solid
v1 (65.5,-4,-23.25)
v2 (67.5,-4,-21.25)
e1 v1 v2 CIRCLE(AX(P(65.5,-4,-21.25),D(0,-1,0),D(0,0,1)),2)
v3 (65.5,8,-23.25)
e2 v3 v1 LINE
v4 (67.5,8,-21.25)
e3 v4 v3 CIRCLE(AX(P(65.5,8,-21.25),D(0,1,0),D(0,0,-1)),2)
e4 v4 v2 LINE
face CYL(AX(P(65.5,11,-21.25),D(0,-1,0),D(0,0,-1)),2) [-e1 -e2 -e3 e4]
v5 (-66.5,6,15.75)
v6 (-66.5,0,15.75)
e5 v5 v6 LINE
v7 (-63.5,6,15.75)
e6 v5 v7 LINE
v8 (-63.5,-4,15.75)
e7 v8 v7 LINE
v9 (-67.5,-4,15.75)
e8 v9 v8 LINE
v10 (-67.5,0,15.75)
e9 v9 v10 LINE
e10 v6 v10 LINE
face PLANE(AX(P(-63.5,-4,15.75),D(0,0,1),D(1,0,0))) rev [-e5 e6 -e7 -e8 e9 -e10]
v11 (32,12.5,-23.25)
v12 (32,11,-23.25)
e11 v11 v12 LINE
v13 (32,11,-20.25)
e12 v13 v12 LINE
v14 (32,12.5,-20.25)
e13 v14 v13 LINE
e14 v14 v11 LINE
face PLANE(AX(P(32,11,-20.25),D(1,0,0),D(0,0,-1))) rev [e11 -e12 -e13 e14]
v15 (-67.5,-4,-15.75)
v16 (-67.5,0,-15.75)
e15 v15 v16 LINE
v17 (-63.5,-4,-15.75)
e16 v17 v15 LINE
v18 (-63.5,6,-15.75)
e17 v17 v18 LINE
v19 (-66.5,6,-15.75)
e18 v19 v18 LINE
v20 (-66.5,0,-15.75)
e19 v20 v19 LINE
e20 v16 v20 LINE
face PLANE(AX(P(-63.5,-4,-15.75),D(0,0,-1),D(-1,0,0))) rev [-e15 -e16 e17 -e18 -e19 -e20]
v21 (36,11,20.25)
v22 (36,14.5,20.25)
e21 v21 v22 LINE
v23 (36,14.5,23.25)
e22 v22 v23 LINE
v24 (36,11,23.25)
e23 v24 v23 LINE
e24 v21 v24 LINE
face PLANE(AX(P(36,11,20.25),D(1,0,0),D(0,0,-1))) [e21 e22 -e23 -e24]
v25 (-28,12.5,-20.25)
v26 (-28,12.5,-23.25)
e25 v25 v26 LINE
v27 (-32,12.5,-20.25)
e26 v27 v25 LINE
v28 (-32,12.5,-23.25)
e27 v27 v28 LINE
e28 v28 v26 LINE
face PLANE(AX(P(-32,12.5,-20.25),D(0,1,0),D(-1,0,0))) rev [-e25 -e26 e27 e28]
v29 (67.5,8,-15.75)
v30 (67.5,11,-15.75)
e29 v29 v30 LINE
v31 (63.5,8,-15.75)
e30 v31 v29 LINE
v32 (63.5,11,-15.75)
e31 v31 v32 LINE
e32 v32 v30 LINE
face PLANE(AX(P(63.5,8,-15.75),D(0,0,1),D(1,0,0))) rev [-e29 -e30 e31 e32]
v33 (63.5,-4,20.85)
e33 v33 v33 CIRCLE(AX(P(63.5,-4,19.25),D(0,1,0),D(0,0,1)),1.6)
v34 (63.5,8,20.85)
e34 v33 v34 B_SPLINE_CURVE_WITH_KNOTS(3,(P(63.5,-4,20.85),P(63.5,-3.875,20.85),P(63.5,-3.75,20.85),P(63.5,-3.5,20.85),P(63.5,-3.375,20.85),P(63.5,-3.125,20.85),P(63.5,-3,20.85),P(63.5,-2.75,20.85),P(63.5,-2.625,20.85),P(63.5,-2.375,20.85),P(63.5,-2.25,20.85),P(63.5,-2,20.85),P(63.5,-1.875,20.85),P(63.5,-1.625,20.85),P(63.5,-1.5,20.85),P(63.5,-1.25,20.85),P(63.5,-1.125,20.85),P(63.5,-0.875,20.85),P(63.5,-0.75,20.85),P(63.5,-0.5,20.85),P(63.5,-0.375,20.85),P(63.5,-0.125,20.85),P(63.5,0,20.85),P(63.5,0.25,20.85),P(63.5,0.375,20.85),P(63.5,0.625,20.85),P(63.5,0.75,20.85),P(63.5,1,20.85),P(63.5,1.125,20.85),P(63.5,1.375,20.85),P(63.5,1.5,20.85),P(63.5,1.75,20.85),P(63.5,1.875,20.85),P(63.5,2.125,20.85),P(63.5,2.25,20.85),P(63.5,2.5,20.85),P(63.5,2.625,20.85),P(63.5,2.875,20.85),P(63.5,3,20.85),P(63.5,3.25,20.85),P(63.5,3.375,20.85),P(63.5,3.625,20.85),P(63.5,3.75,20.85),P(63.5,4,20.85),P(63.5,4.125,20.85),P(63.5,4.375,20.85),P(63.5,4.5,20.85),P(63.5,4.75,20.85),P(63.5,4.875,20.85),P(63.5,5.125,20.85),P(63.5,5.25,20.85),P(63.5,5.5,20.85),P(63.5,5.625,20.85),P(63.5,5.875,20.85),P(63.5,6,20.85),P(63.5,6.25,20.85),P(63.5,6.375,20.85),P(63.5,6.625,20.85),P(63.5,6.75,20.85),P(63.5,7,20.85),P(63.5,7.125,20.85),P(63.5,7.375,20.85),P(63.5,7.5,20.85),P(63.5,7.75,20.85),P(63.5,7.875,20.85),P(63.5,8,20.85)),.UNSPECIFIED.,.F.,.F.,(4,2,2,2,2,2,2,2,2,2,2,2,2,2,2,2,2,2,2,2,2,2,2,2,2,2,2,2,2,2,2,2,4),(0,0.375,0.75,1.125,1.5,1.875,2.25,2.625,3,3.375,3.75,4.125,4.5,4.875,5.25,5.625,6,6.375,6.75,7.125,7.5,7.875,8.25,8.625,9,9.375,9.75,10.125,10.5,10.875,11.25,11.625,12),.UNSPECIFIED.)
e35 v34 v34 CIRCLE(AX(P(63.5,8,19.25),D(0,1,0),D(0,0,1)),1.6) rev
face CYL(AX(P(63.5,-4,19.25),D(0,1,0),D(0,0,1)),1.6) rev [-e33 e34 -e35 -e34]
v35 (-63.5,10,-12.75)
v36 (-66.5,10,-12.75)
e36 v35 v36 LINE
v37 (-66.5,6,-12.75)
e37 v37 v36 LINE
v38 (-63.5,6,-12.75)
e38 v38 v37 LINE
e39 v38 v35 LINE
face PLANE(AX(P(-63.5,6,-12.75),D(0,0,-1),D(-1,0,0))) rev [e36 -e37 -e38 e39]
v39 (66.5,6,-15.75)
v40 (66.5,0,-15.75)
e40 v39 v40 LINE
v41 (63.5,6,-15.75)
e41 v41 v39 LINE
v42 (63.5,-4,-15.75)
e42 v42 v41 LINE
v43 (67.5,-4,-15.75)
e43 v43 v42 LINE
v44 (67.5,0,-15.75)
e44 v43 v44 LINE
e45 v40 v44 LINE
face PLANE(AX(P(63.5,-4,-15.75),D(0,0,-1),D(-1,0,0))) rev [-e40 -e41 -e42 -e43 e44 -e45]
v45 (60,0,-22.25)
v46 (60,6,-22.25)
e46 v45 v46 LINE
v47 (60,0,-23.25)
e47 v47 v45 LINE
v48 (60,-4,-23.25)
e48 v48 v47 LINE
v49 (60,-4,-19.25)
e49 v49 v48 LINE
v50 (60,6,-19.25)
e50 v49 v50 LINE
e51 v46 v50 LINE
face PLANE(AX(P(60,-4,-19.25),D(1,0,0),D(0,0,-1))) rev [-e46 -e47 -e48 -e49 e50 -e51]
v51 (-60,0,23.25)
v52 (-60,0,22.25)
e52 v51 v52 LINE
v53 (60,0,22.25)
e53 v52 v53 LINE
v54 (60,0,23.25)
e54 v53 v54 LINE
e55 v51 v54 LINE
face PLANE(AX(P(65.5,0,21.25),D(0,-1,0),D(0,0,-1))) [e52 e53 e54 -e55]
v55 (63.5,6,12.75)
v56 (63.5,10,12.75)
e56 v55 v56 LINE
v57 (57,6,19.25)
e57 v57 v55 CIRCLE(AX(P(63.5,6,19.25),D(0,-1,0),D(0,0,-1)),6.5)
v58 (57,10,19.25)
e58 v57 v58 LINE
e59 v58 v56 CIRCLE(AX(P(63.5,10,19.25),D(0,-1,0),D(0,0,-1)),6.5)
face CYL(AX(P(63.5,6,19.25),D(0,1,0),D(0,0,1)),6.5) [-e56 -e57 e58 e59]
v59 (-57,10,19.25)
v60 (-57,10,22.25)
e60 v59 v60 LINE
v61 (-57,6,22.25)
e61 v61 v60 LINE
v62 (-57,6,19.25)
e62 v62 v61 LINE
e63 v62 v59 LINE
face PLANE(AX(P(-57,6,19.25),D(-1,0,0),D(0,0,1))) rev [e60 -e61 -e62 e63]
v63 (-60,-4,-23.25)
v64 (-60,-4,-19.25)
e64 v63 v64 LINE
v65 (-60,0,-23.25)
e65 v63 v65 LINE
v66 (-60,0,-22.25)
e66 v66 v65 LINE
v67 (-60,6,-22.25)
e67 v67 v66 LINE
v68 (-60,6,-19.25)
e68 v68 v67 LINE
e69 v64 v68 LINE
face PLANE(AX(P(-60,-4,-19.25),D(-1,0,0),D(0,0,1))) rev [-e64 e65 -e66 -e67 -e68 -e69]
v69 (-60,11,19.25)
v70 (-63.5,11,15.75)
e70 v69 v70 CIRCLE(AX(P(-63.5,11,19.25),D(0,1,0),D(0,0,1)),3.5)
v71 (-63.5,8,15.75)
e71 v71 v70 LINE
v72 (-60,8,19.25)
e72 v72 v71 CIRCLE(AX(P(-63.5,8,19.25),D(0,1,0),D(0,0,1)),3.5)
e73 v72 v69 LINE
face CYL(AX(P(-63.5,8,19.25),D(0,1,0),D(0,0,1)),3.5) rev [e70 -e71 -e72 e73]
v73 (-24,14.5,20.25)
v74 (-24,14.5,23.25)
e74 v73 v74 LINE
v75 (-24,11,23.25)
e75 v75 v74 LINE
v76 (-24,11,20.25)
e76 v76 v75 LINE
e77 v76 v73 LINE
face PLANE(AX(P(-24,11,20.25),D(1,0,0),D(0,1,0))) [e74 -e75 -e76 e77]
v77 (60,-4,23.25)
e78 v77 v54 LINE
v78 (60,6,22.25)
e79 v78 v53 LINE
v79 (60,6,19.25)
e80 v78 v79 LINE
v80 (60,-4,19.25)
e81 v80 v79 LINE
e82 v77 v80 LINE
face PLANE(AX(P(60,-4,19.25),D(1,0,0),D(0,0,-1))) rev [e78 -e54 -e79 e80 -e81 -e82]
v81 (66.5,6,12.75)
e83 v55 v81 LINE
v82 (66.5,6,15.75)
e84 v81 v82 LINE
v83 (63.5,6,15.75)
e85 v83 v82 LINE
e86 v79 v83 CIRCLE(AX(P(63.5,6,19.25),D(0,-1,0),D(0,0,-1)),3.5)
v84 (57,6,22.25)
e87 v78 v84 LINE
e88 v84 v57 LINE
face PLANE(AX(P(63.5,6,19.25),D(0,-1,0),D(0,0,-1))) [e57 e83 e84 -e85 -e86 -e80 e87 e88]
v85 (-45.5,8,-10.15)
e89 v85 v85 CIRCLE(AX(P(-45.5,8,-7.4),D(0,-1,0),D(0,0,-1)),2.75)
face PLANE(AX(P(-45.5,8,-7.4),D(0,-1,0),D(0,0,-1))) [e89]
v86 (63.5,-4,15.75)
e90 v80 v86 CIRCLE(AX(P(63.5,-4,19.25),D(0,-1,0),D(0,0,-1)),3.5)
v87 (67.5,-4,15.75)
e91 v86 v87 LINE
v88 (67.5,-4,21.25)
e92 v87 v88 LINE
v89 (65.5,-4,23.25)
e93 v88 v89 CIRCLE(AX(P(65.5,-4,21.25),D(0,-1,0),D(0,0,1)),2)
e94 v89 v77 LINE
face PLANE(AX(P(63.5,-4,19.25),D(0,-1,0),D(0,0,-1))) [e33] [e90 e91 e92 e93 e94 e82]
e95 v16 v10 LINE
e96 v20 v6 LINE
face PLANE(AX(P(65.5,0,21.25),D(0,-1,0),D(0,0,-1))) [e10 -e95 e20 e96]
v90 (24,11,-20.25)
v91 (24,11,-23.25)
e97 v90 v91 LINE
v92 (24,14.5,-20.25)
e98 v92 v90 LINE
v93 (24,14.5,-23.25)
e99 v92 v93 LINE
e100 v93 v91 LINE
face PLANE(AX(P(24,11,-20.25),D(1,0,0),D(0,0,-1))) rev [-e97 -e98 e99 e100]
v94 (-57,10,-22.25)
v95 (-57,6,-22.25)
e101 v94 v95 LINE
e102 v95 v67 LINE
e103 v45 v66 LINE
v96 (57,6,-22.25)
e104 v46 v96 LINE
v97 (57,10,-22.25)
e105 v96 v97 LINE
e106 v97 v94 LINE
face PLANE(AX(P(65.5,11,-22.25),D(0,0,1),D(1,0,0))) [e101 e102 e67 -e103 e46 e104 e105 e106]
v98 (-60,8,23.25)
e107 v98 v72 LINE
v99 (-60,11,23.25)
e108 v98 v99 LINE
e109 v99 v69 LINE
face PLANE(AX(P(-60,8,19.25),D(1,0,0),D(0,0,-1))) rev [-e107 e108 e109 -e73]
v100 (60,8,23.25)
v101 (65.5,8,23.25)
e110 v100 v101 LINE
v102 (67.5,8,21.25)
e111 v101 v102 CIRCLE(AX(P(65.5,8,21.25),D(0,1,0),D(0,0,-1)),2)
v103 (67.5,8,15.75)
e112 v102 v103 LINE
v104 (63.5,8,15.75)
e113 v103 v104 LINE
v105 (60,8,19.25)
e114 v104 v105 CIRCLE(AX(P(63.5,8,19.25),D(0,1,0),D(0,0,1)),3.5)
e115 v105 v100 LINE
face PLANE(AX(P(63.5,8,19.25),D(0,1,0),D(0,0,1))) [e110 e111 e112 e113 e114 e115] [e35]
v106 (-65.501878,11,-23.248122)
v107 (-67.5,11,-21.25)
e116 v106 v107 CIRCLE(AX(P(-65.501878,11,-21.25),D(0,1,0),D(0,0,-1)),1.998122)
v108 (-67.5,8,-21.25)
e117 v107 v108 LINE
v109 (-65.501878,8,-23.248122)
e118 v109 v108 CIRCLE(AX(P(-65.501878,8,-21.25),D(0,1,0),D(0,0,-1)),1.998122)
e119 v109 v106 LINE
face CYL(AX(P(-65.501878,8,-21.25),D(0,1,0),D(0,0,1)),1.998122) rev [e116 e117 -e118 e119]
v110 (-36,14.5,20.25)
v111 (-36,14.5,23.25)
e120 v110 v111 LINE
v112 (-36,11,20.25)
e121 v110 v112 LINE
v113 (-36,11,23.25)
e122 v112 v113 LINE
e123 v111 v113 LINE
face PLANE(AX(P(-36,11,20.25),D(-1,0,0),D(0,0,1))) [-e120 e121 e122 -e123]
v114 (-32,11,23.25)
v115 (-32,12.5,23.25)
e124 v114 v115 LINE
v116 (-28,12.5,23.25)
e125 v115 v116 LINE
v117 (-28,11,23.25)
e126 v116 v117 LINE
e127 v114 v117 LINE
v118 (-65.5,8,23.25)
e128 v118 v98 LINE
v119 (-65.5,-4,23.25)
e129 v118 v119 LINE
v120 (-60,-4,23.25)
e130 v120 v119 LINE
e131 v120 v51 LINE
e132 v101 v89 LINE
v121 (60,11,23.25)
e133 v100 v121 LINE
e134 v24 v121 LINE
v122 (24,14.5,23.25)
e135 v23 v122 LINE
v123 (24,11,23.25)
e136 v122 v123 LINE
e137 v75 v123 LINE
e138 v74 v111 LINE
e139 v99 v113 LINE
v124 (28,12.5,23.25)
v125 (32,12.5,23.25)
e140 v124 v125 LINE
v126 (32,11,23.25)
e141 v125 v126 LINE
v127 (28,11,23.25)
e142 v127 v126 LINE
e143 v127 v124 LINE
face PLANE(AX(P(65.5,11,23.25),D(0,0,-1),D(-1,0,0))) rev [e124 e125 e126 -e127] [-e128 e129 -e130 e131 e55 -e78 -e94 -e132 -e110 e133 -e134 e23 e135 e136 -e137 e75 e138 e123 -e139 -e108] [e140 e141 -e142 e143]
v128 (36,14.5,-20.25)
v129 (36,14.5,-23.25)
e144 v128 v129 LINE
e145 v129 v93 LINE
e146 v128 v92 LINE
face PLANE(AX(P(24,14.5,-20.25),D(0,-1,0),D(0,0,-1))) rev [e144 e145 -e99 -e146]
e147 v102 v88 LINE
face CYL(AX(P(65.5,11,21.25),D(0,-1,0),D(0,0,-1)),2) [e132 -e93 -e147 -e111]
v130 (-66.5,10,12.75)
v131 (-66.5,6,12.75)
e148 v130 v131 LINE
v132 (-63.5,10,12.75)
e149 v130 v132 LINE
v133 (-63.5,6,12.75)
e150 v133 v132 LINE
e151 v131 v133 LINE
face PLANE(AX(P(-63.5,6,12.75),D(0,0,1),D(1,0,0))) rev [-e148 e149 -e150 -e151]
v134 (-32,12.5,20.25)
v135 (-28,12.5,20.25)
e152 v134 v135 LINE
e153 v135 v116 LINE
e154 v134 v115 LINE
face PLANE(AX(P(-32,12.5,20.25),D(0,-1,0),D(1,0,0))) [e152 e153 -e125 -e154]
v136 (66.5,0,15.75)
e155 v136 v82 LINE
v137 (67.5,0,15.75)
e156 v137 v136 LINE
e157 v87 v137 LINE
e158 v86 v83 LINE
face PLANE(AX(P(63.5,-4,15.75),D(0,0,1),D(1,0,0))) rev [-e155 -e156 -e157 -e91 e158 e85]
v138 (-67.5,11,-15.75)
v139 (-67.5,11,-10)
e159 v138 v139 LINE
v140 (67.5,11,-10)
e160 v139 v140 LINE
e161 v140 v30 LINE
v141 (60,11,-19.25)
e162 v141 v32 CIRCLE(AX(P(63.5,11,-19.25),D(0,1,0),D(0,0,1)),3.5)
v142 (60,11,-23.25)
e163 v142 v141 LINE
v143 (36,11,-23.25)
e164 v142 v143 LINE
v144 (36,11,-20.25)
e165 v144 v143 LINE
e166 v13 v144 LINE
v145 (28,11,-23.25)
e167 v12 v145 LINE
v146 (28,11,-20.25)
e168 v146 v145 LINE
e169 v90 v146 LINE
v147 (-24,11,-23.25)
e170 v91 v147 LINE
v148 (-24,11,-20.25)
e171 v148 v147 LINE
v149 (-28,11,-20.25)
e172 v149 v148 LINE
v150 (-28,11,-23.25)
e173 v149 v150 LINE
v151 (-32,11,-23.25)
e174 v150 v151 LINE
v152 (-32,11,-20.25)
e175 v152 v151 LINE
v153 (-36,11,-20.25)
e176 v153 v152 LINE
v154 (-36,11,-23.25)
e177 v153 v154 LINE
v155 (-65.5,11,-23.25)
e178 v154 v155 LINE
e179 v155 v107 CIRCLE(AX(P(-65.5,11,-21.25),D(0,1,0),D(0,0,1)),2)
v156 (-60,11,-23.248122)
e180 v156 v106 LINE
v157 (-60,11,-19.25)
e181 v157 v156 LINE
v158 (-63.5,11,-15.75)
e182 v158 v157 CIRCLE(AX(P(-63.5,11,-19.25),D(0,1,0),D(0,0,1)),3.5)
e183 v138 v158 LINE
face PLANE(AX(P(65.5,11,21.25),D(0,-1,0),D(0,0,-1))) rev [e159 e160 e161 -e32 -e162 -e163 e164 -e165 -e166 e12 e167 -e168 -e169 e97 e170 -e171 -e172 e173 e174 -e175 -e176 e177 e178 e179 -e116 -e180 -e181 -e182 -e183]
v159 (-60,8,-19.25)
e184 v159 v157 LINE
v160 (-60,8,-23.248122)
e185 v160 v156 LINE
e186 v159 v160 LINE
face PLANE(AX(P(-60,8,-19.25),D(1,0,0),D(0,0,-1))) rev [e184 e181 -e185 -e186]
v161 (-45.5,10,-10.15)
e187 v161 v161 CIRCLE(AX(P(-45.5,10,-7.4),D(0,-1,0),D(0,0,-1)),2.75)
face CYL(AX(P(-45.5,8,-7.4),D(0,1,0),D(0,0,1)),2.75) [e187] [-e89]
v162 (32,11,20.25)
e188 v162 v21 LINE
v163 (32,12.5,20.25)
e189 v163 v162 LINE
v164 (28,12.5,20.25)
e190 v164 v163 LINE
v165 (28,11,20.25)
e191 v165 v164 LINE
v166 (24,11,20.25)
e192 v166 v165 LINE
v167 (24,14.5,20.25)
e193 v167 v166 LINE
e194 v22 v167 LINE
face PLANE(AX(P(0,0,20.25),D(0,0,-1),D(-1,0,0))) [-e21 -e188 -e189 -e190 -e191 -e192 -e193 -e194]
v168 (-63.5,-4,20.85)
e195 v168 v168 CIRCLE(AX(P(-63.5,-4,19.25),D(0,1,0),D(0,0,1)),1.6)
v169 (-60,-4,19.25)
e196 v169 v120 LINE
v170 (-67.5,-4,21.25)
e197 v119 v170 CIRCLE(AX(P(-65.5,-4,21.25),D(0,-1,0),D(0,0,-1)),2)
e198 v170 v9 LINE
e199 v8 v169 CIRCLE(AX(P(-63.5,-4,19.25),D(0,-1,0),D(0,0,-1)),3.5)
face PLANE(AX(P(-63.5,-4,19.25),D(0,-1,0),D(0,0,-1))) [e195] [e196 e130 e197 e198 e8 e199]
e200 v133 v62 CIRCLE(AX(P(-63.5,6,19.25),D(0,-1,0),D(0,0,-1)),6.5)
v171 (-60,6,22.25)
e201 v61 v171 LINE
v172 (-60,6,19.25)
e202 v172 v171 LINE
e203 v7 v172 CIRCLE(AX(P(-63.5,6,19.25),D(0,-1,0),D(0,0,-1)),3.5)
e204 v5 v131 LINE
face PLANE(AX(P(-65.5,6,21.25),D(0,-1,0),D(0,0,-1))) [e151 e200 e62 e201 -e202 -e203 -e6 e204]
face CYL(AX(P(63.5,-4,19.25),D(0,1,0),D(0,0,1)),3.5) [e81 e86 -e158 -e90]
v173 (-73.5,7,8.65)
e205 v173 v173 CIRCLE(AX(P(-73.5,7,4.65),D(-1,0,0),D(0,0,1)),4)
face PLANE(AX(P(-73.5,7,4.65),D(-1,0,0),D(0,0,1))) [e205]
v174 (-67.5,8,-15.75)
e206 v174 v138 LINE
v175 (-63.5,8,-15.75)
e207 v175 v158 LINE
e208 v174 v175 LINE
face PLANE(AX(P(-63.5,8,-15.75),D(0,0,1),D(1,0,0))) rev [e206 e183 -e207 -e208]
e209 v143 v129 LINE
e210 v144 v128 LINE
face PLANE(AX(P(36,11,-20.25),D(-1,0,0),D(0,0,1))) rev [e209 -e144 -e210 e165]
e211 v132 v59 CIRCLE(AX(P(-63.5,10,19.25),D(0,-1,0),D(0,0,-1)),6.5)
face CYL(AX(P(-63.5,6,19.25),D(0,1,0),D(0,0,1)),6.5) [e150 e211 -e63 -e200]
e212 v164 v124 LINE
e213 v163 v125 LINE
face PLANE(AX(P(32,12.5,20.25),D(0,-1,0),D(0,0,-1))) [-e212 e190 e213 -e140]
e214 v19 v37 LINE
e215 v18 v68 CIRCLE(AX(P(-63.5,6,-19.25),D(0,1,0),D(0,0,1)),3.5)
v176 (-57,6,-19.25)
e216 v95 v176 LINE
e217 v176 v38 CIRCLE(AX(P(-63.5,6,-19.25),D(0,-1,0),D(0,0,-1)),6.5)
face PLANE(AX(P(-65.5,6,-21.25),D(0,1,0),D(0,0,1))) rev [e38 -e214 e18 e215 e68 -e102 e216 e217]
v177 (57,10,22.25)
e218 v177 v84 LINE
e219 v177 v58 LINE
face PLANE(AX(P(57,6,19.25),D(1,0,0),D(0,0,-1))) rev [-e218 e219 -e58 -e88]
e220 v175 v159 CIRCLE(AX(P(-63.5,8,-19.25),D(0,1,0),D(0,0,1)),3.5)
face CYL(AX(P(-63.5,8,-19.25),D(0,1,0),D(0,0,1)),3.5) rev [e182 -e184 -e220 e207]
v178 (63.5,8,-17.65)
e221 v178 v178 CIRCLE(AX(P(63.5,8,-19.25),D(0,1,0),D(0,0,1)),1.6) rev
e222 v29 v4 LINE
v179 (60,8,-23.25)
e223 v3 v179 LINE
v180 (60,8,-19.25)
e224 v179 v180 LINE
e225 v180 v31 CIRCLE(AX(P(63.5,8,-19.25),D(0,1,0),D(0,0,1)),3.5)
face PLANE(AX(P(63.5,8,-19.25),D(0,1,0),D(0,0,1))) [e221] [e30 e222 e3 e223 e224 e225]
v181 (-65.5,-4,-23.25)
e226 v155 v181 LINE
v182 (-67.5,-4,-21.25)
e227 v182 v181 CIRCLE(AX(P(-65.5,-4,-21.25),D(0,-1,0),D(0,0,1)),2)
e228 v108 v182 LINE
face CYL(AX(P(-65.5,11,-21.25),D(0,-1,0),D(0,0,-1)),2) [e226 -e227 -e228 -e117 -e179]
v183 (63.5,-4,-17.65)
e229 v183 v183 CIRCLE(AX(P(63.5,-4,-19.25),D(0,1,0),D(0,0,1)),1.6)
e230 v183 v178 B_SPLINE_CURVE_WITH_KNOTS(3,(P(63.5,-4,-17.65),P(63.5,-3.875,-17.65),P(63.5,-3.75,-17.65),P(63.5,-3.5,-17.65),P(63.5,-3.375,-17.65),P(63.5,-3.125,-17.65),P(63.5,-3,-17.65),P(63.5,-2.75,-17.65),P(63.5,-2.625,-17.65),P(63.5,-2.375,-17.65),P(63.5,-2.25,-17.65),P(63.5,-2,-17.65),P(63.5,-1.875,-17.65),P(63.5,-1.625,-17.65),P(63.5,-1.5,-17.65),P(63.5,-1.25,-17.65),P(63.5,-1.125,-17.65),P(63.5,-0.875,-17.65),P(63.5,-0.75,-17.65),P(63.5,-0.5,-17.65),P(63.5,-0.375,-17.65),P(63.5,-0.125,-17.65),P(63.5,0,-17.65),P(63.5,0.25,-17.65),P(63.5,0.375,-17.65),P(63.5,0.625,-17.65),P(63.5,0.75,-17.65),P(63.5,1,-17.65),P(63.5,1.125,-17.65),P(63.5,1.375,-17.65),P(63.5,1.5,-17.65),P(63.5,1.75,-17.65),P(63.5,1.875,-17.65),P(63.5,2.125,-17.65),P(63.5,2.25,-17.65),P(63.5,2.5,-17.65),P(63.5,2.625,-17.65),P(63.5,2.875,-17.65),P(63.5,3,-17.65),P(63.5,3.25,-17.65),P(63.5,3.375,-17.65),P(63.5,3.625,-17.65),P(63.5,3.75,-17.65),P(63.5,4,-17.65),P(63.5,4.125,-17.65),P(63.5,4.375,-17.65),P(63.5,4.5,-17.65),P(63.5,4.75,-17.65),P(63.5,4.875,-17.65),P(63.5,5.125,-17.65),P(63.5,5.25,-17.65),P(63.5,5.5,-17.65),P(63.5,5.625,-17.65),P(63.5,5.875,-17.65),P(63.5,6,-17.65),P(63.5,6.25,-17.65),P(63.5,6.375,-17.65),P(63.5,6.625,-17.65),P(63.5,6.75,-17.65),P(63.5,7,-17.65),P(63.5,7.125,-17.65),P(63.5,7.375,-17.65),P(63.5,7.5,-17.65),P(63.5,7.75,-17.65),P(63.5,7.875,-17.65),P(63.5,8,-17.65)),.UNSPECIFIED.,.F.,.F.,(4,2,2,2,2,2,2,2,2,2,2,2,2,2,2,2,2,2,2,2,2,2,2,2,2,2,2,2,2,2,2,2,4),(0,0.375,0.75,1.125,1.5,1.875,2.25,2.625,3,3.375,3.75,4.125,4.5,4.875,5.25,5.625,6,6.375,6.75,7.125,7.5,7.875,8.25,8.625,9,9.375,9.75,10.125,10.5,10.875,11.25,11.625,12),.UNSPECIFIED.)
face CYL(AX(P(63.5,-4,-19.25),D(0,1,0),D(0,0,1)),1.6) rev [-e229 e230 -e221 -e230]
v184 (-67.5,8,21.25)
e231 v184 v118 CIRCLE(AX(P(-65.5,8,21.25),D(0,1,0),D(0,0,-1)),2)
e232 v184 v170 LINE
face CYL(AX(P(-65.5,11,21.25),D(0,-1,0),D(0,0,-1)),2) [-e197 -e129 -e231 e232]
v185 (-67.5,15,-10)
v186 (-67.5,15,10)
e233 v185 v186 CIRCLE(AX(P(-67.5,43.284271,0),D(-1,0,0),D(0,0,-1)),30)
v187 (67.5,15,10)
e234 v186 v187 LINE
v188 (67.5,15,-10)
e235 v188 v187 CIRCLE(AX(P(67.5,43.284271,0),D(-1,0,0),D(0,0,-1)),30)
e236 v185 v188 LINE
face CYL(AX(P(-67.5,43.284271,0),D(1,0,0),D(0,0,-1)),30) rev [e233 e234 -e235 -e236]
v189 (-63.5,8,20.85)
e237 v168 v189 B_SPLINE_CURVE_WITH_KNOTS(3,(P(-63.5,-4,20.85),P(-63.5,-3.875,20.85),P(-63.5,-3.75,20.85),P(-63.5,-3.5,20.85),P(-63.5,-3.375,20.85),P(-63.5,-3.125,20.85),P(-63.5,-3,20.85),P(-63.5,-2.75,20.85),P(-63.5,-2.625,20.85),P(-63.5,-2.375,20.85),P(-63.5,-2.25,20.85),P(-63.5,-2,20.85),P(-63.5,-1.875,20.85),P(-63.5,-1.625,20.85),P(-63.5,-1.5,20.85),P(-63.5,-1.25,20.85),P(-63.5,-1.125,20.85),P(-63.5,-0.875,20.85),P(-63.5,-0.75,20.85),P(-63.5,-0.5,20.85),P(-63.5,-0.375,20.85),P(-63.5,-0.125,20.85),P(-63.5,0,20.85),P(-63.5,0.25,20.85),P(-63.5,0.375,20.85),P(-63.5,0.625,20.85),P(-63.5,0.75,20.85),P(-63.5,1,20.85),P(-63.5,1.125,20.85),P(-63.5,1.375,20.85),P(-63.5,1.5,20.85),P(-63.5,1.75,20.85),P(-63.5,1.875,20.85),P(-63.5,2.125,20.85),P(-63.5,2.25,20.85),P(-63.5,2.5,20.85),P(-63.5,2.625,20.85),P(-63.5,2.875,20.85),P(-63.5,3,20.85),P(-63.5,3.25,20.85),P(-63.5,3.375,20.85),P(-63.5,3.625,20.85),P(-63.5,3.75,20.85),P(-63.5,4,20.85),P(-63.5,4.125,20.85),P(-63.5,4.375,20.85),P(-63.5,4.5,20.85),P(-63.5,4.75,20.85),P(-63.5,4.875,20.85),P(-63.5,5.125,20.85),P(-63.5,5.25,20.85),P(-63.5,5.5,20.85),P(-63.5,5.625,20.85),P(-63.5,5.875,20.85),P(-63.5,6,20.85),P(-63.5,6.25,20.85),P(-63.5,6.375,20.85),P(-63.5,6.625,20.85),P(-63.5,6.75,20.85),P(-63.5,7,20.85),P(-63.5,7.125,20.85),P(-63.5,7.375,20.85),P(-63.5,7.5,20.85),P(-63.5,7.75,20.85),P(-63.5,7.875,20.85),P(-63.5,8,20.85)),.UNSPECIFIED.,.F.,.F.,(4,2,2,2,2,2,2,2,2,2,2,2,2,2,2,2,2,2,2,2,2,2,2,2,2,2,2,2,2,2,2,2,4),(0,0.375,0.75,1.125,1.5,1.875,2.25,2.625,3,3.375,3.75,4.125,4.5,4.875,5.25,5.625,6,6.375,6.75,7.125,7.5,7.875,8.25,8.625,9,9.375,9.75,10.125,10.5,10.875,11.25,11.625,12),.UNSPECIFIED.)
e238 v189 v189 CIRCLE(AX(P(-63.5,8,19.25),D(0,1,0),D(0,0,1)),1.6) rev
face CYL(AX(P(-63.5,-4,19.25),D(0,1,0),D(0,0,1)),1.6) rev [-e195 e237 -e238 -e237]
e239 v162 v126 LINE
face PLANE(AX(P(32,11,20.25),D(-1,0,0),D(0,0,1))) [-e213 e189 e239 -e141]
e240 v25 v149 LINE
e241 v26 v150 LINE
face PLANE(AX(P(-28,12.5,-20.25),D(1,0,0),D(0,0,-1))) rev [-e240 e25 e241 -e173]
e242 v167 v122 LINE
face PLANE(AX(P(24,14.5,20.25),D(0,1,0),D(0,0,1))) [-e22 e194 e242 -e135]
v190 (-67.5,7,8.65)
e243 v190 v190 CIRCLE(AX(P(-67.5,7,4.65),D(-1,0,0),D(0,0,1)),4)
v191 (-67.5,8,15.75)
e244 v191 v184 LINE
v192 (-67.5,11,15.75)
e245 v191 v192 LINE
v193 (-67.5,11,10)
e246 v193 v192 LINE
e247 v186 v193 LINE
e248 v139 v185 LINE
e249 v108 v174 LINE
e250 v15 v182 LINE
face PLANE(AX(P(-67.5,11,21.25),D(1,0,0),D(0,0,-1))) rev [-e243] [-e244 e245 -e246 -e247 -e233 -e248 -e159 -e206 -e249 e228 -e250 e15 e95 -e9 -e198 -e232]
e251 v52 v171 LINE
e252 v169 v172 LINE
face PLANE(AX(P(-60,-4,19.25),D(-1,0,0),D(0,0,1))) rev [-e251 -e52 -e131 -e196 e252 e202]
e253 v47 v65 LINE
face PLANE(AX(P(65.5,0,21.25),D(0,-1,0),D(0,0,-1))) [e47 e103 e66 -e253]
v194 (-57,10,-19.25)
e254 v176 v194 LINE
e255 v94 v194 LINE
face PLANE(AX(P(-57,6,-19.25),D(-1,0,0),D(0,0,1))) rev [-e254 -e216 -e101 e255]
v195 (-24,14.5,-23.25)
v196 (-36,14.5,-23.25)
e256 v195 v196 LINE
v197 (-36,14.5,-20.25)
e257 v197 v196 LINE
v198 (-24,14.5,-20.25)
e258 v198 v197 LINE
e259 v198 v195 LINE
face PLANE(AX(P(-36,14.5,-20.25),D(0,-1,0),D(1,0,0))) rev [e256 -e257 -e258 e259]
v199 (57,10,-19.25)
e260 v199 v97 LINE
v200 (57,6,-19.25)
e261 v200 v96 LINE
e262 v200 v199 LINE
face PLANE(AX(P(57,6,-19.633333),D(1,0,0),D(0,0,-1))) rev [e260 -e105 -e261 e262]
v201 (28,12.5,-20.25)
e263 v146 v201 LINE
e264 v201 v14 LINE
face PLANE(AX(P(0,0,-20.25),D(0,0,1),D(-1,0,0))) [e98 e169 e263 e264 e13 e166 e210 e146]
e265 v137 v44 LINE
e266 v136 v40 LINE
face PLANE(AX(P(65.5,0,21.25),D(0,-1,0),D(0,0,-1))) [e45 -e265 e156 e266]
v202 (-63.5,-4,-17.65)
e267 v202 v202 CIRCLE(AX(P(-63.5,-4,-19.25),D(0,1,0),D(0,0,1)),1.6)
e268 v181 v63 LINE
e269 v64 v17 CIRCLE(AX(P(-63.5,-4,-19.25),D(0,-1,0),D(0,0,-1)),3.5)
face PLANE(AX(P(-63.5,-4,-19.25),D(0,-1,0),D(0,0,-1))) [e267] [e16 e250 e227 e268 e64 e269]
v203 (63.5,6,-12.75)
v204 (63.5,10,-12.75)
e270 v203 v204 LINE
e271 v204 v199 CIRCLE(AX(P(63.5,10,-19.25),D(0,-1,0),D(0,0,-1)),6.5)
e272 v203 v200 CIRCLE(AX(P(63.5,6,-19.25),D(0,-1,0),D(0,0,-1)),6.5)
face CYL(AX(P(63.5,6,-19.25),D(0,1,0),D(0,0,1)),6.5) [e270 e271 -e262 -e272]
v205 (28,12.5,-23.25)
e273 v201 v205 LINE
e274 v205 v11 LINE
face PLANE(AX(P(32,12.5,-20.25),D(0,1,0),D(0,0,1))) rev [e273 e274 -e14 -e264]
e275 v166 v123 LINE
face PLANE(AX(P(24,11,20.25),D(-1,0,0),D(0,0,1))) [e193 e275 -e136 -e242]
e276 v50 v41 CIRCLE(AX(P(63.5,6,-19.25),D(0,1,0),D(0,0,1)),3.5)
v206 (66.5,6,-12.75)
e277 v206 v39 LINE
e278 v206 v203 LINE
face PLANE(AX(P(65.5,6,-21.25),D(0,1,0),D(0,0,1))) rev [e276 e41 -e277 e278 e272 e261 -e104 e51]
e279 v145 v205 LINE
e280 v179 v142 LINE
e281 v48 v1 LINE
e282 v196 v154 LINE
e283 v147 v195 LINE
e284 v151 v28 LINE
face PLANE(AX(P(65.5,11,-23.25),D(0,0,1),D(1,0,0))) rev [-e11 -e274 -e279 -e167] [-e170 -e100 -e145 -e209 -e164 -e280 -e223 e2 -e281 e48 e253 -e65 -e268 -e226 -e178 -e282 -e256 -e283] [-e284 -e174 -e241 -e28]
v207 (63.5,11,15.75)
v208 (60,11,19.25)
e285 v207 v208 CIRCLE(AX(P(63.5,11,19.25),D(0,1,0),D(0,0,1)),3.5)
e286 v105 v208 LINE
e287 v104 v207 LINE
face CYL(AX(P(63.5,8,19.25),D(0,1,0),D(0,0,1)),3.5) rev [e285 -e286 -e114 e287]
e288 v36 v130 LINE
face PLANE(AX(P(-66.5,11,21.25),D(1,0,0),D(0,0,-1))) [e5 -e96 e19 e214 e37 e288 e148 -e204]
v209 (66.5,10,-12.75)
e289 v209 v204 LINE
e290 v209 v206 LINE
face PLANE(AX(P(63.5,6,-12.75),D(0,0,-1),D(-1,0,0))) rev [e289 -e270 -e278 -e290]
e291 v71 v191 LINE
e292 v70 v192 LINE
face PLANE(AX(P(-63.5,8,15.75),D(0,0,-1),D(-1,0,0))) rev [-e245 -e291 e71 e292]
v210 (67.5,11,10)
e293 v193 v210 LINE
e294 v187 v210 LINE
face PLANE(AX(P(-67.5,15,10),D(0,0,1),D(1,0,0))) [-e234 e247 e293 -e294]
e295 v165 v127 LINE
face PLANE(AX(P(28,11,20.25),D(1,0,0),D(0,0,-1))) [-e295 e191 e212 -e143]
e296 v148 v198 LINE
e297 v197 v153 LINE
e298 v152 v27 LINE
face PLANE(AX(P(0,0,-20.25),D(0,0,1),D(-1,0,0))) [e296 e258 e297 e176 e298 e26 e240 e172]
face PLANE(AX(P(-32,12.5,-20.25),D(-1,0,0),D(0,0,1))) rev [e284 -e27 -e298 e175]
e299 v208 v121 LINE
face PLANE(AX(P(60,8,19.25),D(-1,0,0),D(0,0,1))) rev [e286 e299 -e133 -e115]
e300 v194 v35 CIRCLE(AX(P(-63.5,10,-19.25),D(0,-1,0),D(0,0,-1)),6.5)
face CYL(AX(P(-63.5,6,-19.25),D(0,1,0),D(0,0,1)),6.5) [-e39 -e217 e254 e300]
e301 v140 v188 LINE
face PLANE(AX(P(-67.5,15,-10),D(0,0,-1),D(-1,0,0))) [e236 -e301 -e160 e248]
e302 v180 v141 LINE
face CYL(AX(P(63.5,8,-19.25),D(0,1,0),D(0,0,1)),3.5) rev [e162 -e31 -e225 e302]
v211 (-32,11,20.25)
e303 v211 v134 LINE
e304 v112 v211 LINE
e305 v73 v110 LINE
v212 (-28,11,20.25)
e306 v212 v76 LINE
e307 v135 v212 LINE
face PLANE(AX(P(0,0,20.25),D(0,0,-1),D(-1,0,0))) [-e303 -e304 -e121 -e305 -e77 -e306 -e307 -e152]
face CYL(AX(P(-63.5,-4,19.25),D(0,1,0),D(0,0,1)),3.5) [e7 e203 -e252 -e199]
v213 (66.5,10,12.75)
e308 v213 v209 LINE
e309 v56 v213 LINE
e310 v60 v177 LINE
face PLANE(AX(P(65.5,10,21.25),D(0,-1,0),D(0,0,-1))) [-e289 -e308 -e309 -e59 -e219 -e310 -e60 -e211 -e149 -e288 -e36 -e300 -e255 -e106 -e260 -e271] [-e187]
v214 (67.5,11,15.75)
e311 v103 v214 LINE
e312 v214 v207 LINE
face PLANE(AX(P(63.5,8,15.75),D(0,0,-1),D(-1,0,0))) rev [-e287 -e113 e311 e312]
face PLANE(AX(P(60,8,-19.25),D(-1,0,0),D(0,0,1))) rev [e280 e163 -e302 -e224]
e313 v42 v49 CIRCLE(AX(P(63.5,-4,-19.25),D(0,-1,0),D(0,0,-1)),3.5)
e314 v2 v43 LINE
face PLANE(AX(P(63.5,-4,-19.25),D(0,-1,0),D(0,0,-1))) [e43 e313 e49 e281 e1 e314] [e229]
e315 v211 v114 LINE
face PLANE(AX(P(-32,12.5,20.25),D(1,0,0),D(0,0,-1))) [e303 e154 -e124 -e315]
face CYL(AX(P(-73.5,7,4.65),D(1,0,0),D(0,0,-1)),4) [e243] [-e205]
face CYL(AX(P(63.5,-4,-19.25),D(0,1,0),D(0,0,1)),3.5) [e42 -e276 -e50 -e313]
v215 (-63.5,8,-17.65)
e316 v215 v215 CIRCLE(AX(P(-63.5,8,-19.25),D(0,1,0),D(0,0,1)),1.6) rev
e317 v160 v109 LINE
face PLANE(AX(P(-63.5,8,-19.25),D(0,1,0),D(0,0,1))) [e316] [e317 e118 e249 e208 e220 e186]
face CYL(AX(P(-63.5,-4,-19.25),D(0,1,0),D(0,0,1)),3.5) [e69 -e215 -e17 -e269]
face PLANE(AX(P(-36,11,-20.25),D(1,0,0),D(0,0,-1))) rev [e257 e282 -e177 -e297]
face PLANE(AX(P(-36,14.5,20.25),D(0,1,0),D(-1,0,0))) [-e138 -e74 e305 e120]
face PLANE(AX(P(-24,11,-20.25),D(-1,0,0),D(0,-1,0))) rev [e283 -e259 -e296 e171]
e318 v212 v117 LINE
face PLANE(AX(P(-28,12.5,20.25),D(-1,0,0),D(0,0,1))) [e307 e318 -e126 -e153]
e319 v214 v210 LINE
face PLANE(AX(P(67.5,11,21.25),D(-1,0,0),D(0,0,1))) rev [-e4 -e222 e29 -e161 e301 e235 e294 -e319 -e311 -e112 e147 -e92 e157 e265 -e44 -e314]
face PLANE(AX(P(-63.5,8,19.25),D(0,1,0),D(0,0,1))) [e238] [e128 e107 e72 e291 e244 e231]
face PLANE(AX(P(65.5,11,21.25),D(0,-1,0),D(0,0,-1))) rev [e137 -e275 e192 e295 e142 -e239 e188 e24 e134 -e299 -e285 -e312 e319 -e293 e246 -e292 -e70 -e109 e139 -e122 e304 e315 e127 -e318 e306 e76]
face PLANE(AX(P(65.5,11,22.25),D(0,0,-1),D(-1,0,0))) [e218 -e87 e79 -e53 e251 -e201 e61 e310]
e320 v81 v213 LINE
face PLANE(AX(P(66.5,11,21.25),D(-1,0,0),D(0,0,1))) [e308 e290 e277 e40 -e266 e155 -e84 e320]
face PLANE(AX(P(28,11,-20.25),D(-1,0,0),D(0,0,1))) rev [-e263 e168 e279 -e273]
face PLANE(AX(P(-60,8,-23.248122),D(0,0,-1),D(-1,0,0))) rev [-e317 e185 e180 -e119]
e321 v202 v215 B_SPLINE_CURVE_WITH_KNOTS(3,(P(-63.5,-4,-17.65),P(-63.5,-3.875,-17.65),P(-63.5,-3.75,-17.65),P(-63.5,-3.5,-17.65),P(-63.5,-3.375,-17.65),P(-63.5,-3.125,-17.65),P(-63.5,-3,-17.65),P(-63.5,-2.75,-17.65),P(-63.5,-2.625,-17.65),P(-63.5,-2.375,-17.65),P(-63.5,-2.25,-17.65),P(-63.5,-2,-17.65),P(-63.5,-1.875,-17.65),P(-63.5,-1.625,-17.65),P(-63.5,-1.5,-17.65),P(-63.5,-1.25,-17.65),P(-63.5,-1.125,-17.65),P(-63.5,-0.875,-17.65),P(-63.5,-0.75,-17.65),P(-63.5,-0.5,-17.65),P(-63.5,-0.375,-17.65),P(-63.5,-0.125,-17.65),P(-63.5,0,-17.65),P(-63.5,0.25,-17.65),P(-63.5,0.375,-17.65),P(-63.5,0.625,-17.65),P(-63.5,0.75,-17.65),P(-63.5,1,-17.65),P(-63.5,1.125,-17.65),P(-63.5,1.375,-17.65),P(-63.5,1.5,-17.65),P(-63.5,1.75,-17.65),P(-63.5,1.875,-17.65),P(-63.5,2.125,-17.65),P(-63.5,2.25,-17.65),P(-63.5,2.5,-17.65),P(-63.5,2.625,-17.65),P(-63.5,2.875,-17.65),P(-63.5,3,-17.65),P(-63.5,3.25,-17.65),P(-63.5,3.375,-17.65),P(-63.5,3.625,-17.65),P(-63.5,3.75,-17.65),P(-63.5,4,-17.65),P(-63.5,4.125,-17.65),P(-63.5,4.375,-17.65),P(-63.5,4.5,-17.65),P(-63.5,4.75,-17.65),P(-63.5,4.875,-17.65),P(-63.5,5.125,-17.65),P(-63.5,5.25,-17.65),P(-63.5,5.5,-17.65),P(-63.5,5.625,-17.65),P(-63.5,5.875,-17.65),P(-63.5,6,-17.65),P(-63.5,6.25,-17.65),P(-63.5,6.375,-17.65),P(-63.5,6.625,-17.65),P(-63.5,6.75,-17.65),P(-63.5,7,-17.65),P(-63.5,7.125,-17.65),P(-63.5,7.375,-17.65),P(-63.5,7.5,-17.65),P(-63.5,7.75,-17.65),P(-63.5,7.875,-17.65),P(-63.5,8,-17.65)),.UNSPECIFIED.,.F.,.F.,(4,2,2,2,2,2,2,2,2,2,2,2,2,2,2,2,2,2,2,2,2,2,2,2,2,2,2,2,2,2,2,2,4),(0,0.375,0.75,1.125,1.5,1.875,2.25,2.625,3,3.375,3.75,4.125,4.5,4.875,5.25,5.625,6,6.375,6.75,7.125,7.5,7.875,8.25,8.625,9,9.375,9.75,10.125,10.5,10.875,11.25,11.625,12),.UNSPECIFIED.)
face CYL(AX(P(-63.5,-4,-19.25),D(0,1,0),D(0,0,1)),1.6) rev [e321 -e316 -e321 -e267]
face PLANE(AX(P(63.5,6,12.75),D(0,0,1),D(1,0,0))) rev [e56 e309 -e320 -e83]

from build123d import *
from build123d.topology import SkipClean

# Parameters (mm, degrees)
BOSS_EXTRUDE1_DEPTH     = 11
SHELL1_T                = -1
BOSS_EXTRUDE2_START     = 14
BOSS_EXTRUDE2_DEPTH     = 14
BOSS_EXTRUDE3_START     = 4
BOSS_EXTRUDE3_DEPTH     = 4
CUT_EXTRUDE1_DEPTH      = 73.950753937
CUT_EXTRUDE1_DEPTH_BACK = 73.950753937
SKETCH5_R               = 1.6
CUT_EXTRUDE3_START      = -3
CUT_EXTRUDE3_DEPTH      = 3
SKETCH13_R              = 2.75
BOSS_EXTRUDE4_DEPTH     = 2
SKETCH14_R              = 4
BOSS_EXTRUDE5_DEPTH     = 6
BOSS_EXTRUDE6_START     = -135
BOSS_EXTRUDE6_DEPTH     = 135
BOSS_EXTRUDE7_DEPTH     = 3


with BuildPart() as part:
    # Sketch1 → Boss-Extrude1 (new body)
    with BuildSketch(Plane(origin=(0, 0, 0), x_dir=(1, 0, 0), z_dir=(0, 1, 0))):
        with BuildLine():
            Line((65.5, -23.25), (-65.5, -23.25))
            ThreePointArc((-65.5, -23.25), (-66.914213562, -22.664213562), (-67.5, -21.25))
            Line((-67.5, -21.25), (-67.5, 21.25))
            ThreePointArc((-67.5, 21.25), (-66.914213562, 22.664213562), (-65.5, 23.25))
            Line((-65.5, 23.25), (65.5, 23.25))
            ThreePointArc((65.5, 23.25), (66.914213562, 22.664213562), (67.5, 21.25))
            Line((67.5, 21.25), (67.5, -21.25))
            ThreePointArc((67.5, -21.25), (66.914213562, -22.664213562), (65.5, -23.25))
        make_face()
    extrude(amount=BOSS_EXTRUDE1_DEPTH)

    # Shell1
    shell1_openings = [part.faces().sort_by_distance(p)[0] for p in [
        (0, 0, 0),
    ]]
    offset(amount=SHELL1_T, openings=shell1_openings, kind=Kind.INTERSECTION)

    # Sketch4 → Boss-Extrude2 (add)
    with SkipClean():  # the faces are left unmerged after this step: merging them gives an invalid solid
        with BuildSketch(Plane.XZ.offset(-10).offset(BOSS_EXTRUDE2_START)):
            with BuildLine():
                Line((65.5, -23.25), (60, -23.25))
                Line((60, -23.25), (60, -19.25))
                ThreePointArc((60, -19.25), (61.025126266, -16.775126266), (63.5, -15.75))
                Line((63.5, -15.75), (67.5, -15.75))
                Line((67.5, -15.75), (67.5, -21.25))
                ThreePointArc((67.5, -21.25), (66.914213562, -22.664213562), (65.5, -23.25))
            make_face()
            with BuildLine():
                Line((65.5, 23.25), (60, 23.25))
                Line((60, 23.25), (60, 19.25))
                ThreePointArc((60, 19.25), (61.025126266, 16.775126266), (63.5, 15.75))
                Line((63.5, 15.75), (67.5, 15.75))
                Line((67.5, 15.75), (67.5, 21.25))
                ThreePointArc((67.5, 21.25), (66.914213562, 22.664213562), (65.5, 23.25))
            make_face()
            with BuildLine():
                Line((-67.5, -21.25), (-67.5, -15.75))
                Line((-67.5, -15.75), (-63.5, -15.75))
                ThreePointArc((-63.5, -15.75), (-61.025126266, -16.775126266), (-60, -19.25))
                Line((-60, -19.25), (-60, -23.25))
                Line((-60, -23.25), (-65.5, -23.25))
                ThreePointArc((-65.5, -23.25), (-66.914213562, -22.664213562), (-67.5, -21.25))
            make_face()
            with BuildLine():
                Line((-60, 19.25), (-60, 23.25))
                Line((-60, 23.25), (-65.5, 23.25))
                ThreePointArc((-65.5, 23.25), (-66.914213562, 22.664213562), (-67.5, 21.25))
                Line((-67.5, 21.25), (-67.5, 15.75))
                Line((-67.5, 15.75), (-63.5, 15.75))
                ThreePointArc((-63.5, 15.75), (-61.025126266, 16.775126266), (-60, 19.25))
            make_face()
        extrude(amount=-BOSS_EXTRUDE2_DEPTH)
    add(part.part.scale(1), mode=Mode.REPLACE)  # the faces are merged on a copy

    # Sketch7 → Boss-Extrude3 (add)
    with SkipClean():  # the faces are left unmerged after this step: merging them gives an invalid solid
        with BuildSketch(Plane.XZ.offset(-10).offset(BOSS_EXTRUDE3_START)):
            with BuildLine():
                Line((65.5, -23.25), (60, -23.25))
                Line((60, -23.25), (57, -23.25))
                Line((57, -23.25), (57, -19.633333333))
                Line((57, -19.633333333), (57, -19.25))
                ThreePointArc((57, -19.25), (58.903805922, -14.653805922), (63.5, -12.75))
                Line((63.5, -12.75), (67.5, -12.75))
                Line((67.5, -12.75), (67.5, -15.75))
                Line((67.5, -15.75), (67.5, -21.25))
                ThreePointArc((67.5, -21.25), (66.914213562, -22.664213562), (65.5, -23.25))
            make_face()
            with BuildLine():
                Line((65.5, 23.25), (60, 23.25))
                Line((60, 23.25), (57, 23.25))
                Line((57, 23.25), (57, 19.25))
                ThreePointArc((57, 19.25), (58.903805922, 14.653805922), (63.5, 12.75))
                Line((63.5, 12.75), (67.5, 12.75))
                Line((67.5, 12.75), (67.5, 15.75))
                Line((67.5, 15.75), (67.5, 21.25))
                ThreePointArc((67.5, 21.25), (66.914213562, 22.664213562), (65.5, 23.25))
            make_face()
            with BuildLine():
                Line((-67.5, -21.25), (-67.5, -15.75))
                Line((-67.5, -15.75), (-67.5, -12.75))
                Line((-67.5, -12.75), (-63.5, -12.75))
                ThreePointArc((-63.5, -12.75), (-58.903805922, -14.653805922), (-57, -19.25))
                Line((-57, -19.25), (-57, -23.25))
                Line((-57, -23.25), (-60, -23.25))
                Line((-60, -23.25), (-65.5, -23.25))
                ThreePointArc((-65.5, -23.25), (-66.914213562, -22.664213562), (-67.5, -21.25))
            make_face()
            with BuildLine():
                Line((-67.5, 15.75), (-67.5, 21.25))
                ThreePointArc((-67.5, 21.25), (-66.914213562, 22.664213562), (-65.5, 23.25))
                Line((-65.5, 23.25), (-60, 23.25))
                Line((-60, 23.25), (-57, 23.25))
                Line((-57, 23.25), (-57, 19.25))
                ThreePointArc((-57, 19.25), (-58.903805922, 14.653805922), (-63.5, 12.75))
                Line((-63.5, 12.75), (-67.5, 12.75))
                Line((-67.5, 12.75), (-67.5, 15.75))
            make_face()
        extrude(amount=-BOSS_EXTRUDE3_DEPTH)
    add(part.part.scale(1), mode=Mode.REPLACE)  # the faces are merged on a copy

    # Sketch5 → Cut-Extrude1 (cut, two sides: drawn at the far end of the back side and taken through both)
    with BuildSketch(Plane(origin=(0, 11, 0), x_dir=(1, 0, 0), z_dir=(0, 1, 0)).offset(-CUT_EXTRUDE1_DEPTH_BACK)):
        with Locations(Location((-63.5, 19.25, 0), (0, 0, 270))):
            Circle(SKETCH5_R)
        with Locations(Location((-63.5, -19.25, 0), (0, 0, 270))):
            Circle(SKETCH5_R)
        with Locations(Location((63.5, 19.25, 0), (0, 0, 270))):
            Circle(SKETCH5_R)
        with Locations(Location((63.5, -19.25, 0), (0, 0, 270))):
            Circle(SKETCH5_R)
    extrude(amount=CUT_EXTRUDE1_DEPTH + CUT_EXTRUDE1_DEPTH_BACK, mode=Mode.SUBTRACT)

    # Sketch12 → Cut-Extrude3 (cut)
    with BuildSketch(Plane(origin=(0, 11, 0), x_dir=(1, 0, 0), z_dir=(0, 1, 0)).offset(CUT_EXTRUDE3_START)):
        with BuildLine():
            Line((-63.5, 15.75), (-67.5, 15.75))
            Line((-67.5, 15.75), (-67.5, 21.25))
            ThreePointArc((-67.5, 21.25), (-66.914763627, 22.662885589), (-65.501878037, 23.248121963))
            Line((-65.501878037, 23.248121963), (-60, 23.248121963))
            Line((-60, 23.248121963), (-60, 19.25))
            ThreePointArc((-60, 19.25), (-61.025126266, 16.775126266), (-63.5, 15.75))
        make_face()
        with BuildLine():
            Line((-63.5, -15.75), (-67.5, -15.75))
            Line((-67.5, -15.75), (-67.5, -21.25))
            ThreePointArc((-67.5, -21.25), (-66.914213562, -22.664213562), (-65.5, -23.25))
            Line((-65.5, -23.25), (-60, -23.25))
            Line((-60, -23.25), (-60, -19.25))
            ThreePointArc((-60, -19.25), (-61.025126266, -16.775126266), (-63.5, -15.75))
        make_face()
        with BuildLine():
            Line((60, -19.25), (60, -23.25))
            Line((60, -23.25), (65.5, -23.25))
            ThreePointArc((65.5, -23.25), (66.914213562, -22.664213562), (67.5, -21.25))
            Line((67.5, -21.25), (67.5, -15.75))
            Line((67.5, -15.75), (63.5, -15.75))
            ThreePointArc((63.5, -15.75), (61.025126266, -16.775126266), (60, -19.25))
        make_face()
        with BuildLine():
            Line((60, 19.25), (60, 23.25))
            Line((60, 23.25), (65.5, 23.25))
            ThreePointArc((65.5, 23.25), (66.914213562, 22.664213562), (67.5, 21.25))
            Line((67.5, 21.25), (67.5, 15.75))
            Line((67.5, 15.75), (63.5, 15.75))
            ThreePointArc((63.5, 15.75), (61.025126266, 16.775126266), (60, 19.25))
        make_face()
    extrude(amount=CUT_EXTRUDE3_DEPTH, mode=Mode.SUBTRACT)

    # Sketch13 → Boss-Extrude4 (add)
    with BuildSketch(Plane.XZ.offset(-10)):
        with Locations(Location((-45.5, -7.4, 0), (0, 0, 270))):
            Circle(SKETCH13_R)
    extrude(amount=BOSS_EXTRUDE4_DEPTH)

    # Sketch14 → Boss-Extrude5 (add)
    with BuildSketch(Plane.ZY.offset(67.5)):
        with Locations(Location((4.65, 7, 0), (0, 0, 90))):
            Circle(SKETCH14_R)
    extrude(amount=BOSS_EXTRUDE5_DEPTH)

    # Sketch15 → Boss-Extrude6 (add)
    with BuildSketch(Plane(origin=(67.5, 0, 0), x_dir=(0, 0, -1), z_dir=(1, 0, 0)).offset(BOSS_EXTRUDE6_START)):
        with BuildLine():
            Line((-10, 15), (-10, 11))
            Line((-10, 11), (10, 11))
            Line((10, 11), (10, 15))
            ThreePointArc((10, 15), (0, 13.284271247), (-10, 15))
        make_face()
    extrude(amount=BOSS_EXTRUDE6_DEPTH)

    # Sketch16 → Boss-Extrude7 (add)
    with BuildSketch(Plane.XY.offset(23.25)):
        Polygon((-36, 11), (-32, 11), (-32, 12.5), (-28, 12.5), (-28, 11), (-24, 11), (-24, 14.5), (-36, 14.5), align=None)
        Polygon((24, 11), (28, 11), (28, 12.5), (32, 12.5), (32, 11), (36, 11), (36, 14.5), (24, 14.5), align=None)
    boss_extrude7 = extrude(amount=-BOSS_EXTRUDE7_DEPTH)

    # Mirror1: Boss-Extrude7 across plane
    add(boss_extrude7.mirror(Plane.XY))


solid = part.part
